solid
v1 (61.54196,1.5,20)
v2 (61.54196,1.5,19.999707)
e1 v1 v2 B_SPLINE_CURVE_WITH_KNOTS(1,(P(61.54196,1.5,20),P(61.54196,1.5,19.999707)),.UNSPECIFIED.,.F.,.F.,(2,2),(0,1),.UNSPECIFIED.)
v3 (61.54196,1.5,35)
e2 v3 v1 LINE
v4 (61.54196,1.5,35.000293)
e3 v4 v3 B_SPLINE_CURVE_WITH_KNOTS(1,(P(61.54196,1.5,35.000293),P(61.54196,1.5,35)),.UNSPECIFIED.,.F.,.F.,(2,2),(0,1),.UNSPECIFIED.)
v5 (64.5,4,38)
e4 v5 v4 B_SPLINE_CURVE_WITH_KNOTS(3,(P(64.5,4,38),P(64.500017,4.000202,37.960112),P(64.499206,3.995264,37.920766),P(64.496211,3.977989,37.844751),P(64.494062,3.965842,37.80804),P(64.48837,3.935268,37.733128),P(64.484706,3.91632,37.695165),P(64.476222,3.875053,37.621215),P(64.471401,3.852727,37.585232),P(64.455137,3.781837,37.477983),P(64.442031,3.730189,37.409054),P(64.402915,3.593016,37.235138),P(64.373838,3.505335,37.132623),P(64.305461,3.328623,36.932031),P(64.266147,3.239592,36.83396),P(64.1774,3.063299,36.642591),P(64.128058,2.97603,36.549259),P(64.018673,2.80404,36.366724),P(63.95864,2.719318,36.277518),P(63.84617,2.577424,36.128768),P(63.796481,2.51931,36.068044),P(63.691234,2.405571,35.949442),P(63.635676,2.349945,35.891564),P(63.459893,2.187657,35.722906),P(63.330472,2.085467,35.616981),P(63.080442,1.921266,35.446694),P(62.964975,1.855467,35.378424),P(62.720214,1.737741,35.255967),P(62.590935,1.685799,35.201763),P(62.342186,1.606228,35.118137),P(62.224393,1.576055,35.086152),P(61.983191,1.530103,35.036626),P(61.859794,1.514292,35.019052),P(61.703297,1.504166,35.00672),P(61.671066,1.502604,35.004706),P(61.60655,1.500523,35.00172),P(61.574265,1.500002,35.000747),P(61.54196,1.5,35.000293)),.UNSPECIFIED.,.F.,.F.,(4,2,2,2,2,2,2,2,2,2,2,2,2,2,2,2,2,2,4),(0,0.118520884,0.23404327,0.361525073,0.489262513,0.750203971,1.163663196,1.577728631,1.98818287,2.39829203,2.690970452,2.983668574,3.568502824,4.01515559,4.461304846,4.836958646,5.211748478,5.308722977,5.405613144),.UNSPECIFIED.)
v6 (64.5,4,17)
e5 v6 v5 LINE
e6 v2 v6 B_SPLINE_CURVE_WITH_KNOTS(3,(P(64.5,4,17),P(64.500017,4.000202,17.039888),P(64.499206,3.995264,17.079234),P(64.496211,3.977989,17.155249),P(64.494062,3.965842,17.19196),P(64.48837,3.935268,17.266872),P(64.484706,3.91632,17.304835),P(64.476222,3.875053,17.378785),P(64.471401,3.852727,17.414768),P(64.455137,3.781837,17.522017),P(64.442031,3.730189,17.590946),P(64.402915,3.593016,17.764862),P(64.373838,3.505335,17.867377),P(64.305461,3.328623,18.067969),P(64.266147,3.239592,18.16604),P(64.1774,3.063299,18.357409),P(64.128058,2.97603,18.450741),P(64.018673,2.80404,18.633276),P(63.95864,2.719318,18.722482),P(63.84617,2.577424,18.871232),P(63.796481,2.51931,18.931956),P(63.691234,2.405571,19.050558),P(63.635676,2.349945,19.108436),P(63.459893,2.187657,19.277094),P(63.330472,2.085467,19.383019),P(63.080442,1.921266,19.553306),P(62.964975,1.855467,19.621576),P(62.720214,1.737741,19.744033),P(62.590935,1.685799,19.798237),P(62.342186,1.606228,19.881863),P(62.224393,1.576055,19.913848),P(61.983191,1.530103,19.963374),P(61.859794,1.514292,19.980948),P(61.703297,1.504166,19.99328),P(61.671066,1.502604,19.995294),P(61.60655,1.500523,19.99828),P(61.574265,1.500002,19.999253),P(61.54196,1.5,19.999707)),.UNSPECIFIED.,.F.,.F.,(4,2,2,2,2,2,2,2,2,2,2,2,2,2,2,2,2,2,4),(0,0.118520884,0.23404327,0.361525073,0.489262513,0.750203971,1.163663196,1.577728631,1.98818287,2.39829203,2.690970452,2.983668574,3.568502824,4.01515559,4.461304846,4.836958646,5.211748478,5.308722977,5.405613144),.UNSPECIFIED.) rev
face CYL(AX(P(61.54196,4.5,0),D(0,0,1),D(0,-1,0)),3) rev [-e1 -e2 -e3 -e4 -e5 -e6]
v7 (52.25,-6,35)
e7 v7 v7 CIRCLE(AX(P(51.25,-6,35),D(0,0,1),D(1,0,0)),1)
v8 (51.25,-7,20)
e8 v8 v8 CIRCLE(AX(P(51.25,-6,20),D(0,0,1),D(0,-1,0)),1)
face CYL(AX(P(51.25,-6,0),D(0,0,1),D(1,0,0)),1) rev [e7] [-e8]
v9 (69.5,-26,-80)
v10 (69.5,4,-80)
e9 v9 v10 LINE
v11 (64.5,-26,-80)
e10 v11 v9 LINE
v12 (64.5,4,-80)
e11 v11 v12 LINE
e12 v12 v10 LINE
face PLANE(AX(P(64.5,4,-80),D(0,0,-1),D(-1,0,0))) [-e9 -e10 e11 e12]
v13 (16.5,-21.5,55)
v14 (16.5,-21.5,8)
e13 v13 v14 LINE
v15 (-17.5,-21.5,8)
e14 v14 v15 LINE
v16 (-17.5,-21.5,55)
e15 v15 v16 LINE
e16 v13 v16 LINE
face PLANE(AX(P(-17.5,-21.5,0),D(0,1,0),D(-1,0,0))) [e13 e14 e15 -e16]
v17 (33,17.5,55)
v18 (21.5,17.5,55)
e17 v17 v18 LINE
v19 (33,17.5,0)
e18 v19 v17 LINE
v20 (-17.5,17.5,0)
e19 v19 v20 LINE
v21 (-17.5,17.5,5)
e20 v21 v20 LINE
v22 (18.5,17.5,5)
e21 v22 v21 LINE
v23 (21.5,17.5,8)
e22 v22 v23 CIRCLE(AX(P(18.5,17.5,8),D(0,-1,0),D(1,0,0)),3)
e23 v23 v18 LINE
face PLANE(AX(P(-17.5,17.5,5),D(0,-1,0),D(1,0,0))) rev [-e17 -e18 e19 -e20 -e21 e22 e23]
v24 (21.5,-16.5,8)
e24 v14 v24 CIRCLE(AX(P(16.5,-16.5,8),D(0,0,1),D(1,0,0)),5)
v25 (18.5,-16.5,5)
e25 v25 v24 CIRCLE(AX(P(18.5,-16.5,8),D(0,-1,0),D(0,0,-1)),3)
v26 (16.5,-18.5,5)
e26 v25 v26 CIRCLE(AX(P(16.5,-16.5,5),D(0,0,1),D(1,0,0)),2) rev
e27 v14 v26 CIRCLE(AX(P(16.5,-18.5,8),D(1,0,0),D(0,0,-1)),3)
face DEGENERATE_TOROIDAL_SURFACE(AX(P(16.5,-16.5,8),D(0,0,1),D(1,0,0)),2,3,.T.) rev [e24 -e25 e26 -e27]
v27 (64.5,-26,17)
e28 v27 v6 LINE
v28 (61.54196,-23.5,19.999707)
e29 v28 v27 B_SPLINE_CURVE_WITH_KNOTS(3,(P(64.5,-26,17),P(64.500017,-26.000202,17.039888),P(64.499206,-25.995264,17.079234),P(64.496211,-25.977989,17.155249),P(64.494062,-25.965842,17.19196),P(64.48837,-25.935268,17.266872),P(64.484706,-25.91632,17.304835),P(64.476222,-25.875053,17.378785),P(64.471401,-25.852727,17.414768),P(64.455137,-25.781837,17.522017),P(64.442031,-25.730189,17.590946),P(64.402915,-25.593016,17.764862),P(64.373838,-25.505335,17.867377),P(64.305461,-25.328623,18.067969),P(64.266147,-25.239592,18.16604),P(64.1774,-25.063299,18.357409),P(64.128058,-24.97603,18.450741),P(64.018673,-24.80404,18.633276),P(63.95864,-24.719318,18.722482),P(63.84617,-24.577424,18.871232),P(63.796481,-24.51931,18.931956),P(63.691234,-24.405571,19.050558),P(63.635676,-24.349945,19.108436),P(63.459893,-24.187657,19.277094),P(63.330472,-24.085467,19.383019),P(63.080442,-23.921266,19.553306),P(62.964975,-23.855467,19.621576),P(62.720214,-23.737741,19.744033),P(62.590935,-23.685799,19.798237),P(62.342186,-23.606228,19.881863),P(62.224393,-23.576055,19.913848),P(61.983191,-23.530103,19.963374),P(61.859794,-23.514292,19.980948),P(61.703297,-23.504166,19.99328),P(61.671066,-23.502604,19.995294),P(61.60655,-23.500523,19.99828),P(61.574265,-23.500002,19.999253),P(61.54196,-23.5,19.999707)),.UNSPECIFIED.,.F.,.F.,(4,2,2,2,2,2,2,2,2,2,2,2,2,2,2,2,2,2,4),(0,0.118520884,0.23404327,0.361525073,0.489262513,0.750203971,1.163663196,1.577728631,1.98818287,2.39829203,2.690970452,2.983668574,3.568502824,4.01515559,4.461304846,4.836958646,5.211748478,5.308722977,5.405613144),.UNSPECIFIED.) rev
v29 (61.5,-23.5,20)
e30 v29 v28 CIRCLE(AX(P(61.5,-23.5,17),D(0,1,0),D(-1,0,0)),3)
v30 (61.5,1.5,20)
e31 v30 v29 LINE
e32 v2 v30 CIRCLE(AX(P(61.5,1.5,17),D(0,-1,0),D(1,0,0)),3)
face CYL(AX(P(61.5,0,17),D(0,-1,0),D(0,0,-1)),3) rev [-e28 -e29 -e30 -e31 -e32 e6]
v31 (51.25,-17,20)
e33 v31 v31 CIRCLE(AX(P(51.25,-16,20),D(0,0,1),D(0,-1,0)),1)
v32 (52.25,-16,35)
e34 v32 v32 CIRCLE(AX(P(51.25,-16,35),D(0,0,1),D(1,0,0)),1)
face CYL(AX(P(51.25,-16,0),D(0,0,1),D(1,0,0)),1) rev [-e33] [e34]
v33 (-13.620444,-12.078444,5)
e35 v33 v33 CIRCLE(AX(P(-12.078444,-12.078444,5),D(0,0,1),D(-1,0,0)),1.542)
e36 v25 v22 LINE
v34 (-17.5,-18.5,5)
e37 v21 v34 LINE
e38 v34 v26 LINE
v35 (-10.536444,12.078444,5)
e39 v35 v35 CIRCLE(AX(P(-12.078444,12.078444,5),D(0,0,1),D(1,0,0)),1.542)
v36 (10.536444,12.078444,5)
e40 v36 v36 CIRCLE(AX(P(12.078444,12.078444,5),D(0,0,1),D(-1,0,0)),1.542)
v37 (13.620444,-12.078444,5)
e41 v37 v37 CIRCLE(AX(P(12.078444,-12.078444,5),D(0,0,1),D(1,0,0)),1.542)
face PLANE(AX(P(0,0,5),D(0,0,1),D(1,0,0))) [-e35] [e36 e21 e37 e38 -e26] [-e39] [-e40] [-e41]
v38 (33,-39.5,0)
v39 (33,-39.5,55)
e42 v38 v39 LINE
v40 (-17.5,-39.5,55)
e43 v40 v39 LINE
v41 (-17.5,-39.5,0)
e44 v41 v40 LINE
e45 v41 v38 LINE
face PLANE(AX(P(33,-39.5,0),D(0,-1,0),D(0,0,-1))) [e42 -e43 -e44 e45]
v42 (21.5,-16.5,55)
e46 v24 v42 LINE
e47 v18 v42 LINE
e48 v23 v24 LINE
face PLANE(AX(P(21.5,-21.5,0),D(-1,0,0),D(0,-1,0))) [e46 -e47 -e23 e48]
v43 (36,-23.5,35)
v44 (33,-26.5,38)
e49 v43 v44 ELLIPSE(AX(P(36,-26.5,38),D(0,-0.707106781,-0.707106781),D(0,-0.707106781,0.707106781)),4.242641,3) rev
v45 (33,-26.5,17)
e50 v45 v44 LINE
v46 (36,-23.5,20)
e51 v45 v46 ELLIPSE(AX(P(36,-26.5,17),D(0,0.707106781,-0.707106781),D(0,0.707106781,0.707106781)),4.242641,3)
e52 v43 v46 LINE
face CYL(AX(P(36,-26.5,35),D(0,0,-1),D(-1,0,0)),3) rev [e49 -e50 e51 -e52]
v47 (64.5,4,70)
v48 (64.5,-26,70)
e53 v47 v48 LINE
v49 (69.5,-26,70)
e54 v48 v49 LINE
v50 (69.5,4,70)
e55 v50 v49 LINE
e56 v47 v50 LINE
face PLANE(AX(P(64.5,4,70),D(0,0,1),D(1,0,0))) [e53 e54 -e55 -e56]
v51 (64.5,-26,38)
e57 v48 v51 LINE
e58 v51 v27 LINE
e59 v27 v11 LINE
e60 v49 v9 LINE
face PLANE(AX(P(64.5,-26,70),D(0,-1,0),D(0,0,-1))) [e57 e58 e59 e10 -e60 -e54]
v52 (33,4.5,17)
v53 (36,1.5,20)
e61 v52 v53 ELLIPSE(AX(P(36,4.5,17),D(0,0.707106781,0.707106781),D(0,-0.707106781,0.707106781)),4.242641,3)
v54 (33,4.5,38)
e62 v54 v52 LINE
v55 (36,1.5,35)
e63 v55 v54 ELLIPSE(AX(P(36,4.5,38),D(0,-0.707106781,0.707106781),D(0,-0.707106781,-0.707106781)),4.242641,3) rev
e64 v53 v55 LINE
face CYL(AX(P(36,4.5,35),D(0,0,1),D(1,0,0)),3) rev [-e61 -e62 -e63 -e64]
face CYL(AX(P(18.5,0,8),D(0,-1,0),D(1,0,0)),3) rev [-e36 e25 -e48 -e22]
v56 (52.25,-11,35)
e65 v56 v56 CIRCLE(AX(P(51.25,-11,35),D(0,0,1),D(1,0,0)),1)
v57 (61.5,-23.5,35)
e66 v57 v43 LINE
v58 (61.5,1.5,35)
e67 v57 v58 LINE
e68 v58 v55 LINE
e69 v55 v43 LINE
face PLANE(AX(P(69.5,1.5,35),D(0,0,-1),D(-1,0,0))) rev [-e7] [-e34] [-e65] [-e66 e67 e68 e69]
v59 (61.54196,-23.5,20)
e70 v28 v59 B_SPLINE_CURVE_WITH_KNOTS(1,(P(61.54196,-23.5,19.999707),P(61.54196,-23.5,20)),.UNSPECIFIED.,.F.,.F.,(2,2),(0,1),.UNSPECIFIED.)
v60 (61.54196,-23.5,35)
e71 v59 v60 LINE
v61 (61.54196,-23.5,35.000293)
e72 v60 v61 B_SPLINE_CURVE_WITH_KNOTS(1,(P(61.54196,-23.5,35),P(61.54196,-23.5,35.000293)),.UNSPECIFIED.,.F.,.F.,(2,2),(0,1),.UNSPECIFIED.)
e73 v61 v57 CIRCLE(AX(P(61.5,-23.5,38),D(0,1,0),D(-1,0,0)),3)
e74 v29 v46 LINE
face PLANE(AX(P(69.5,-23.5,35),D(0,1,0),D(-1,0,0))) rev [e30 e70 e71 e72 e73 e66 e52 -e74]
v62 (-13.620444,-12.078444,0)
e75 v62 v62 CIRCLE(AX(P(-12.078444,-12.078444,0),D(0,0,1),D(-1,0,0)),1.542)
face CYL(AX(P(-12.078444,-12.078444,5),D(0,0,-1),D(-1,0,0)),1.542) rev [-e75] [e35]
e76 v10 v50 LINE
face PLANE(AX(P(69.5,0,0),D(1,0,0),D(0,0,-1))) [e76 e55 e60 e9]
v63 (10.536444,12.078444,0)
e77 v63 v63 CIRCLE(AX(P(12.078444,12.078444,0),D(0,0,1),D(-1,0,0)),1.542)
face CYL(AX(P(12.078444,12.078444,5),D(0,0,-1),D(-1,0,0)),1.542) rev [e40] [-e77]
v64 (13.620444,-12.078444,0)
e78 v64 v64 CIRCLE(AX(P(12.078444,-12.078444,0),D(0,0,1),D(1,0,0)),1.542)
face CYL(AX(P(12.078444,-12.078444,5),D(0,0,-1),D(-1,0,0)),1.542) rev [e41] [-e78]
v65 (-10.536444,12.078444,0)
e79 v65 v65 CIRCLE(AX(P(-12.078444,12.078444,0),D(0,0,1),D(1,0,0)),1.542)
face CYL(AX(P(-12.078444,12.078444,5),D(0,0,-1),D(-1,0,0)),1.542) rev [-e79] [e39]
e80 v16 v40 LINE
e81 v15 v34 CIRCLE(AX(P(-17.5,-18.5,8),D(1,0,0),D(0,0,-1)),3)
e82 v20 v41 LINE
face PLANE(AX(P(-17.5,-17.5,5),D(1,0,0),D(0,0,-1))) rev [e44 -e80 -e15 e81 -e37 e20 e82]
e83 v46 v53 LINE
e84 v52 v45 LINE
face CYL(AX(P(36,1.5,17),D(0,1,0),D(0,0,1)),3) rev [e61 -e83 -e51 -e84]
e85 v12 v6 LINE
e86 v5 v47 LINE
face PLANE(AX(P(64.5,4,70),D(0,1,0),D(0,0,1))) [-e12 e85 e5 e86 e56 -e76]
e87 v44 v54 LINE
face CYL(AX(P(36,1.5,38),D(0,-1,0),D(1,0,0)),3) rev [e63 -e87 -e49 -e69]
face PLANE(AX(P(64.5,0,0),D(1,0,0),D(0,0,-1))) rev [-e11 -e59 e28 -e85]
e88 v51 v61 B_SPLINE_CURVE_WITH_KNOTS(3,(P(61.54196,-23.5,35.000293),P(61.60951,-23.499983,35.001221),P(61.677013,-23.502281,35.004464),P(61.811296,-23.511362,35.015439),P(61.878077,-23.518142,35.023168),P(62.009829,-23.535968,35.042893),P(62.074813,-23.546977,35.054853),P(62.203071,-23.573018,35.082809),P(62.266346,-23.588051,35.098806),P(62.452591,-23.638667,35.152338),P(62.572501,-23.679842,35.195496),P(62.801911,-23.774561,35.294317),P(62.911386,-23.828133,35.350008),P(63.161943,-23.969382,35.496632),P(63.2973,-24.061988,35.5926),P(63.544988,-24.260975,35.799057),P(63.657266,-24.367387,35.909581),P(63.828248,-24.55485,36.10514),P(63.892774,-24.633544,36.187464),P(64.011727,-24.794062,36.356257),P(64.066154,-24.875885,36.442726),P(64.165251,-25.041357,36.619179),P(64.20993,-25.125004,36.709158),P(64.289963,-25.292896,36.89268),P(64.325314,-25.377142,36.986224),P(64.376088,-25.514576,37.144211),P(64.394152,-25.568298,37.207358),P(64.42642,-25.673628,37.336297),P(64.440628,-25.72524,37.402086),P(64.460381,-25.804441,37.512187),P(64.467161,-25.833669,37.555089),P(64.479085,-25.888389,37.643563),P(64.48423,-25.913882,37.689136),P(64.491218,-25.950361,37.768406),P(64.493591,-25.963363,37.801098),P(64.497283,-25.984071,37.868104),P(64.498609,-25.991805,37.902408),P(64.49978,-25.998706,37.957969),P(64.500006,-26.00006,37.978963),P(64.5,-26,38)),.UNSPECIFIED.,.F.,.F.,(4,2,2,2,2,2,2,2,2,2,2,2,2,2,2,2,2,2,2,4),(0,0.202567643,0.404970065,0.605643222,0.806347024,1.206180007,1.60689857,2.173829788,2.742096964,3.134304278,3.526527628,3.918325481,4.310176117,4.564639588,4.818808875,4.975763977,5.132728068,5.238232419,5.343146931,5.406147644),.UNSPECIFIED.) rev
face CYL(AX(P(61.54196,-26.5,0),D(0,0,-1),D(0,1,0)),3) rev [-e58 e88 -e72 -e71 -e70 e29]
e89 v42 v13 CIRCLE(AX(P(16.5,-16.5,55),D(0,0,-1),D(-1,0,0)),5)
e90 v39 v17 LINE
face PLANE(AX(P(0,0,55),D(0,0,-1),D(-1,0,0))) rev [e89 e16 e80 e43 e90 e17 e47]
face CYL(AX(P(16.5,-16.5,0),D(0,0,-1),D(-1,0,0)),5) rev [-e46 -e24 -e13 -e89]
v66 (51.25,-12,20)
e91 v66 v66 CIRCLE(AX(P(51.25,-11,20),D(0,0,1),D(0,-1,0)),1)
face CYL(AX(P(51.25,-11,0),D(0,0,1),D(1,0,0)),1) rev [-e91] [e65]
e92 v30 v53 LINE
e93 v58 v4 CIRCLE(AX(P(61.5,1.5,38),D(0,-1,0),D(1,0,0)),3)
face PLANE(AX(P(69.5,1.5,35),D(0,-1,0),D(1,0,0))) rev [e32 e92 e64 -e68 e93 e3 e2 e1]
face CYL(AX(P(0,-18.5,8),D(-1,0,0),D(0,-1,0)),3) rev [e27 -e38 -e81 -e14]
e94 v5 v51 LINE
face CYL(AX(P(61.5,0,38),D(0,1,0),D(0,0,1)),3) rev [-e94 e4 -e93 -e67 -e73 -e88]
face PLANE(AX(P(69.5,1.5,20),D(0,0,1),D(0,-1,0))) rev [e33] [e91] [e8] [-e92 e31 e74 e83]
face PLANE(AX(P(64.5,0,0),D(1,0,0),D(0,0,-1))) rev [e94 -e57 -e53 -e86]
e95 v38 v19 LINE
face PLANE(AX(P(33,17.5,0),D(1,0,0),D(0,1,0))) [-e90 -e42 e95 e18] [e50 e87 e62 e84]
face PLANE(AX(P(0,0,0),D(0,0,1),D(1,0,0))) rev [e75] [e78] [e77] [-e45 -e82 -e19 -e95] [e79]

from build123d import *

# Parameters (mm, degrees)
SKETCH1_R                = 1.542
BOSS_EXTRUDE1_DEPTH      = 5
BOSS_EXTRUDE4_DEPTH      = 50
BOSS_EXTRUDE4_DEPTH_BACK = 5
FILLET3_R                = 3
FILLET4_R                = 5
BOSS_EXTRUDE5_DEPTH      = 55
SKETCH7_W                = 15
SKETCH7_H                = 25
BOSS_EXTRUDE6_DEPTH      = 36.5
SKETCH8_R                = 1
CUT_EXTRUDE1_DEPTH       = 88.266832187
SKETCH9_W                = 150
SKETCH9_H                = 30
BOSS_EXTRUDE7_DEPTH      = 5
FILLET5_R                = 3
FILLET6_R                = 3


with BuildPart() as part:
    # Sketch1 → Boss-Extrude1 (new body)
    with BuildSketch(Plane.XY):
        Polygon((-17.5, 17.5), (17.5, 17.5), (21.5, 17.5), (21.5, -21.5), (17.5, -21.5), (-17.5, -21.5), (-17.5, -17.5), align=None)
        with Locations((-12.078444483, 12.078444483)):
            Circle(SKETCH1_R, mode=Mode.SUBTRACT)
        with Locations(Location((12.078444483, 12.078444483, 0), (0, 0, 180))):
            Circle(SKETCH1_R, mode=Mode.SUBTRACT)
        with Locations((12.078444483, -12.078444483)):
            Circle(SKETCH1_R, mode=Mode.SUBTRACT)
        with Locations(Location((-12.078444483, -12.078444483, 0), (0, 0, 180))):
            Circle(SKETCH1_R, mode=Mode.SUBTRACT)
    extrude(amount=BOSS_EXTRUDE1_DEPTH)

    # Sketch4 → Boss-Extrude4 (add, two sides: drawn at the far end of the back side and taken through both)
    with BuildSketch(Plane.XY.offset(5).offset(-BOSS_EXTRUDE4_DEPTH_BACK)):
        Polygon((21.5, 17.5), (26, 17.5), (26, -26), (-17.5, -26), (-17.5, -21.5), (21.5, -21.5), align=None)
    extrude(amount=BOSS_EXTRUDE4_DEPTH + BOSS_EXTRUDE4_DEPTH_BACK)

    # Fillet3
    fillet3_edges = [part.edges().sort_by_distance(p)[0] for p in [
        (2, -21.5, 5),
        (21.5, -2, 5),
    ]]
    fillet(fillet3_edges, radius=FILLET3_R)

    # Fillet4
    # the kernel refuses this fillet: 5 mm, written as the material it adds along each edge
    with BuildSketch(Plane(origin=(16.5, -16.5, 5), x_dir=(1, 0, 0), z_dir=(0, 1, 0))) as fillet4_piece_1:
        with BuildLine():
            CenterArc((2, -3), 3, 0, 90)
            Line((5, -3), (5, 0))
            Line((5, 0), (2, 0))
        make_face()
    revolve(axis=Axis((16.5, -16.5, 5), (0, 0, -1)), revolution_arc=90)
    with BuildSketch(Plane(origin=(21.5, -21.5, 5), x_dir=(0, 1, 0), z_dir=(0, 0, 1))) as fillet4_piece_2:
        with BuildLine():
            CenterArc((FILLET4_R, FILLET4_R), FILLET4_R, 180, 90)
            Line((0, FILLET4_R), (0, 0))
            Line((0, 0), (FILLET4_R, 0))
        make_face()
    extrude(amount=50)

    # Sketch6 → Boss-Extrude5 (add, through all)
    with BuildSketch(Plane.XY.offset(55)):
        Polygon((-17.5, -26), (26, -26), (26, 17.5), (33, 17.5), (33, -39.5), (26, -39.5), (-17.5, -39.5), align=None)
    extrude(amount=-BOSS_EXTRUDE5_DEPTH)

    # Sketch7 → Boss-Extrude6 (add)
    with BuildSketch(Plane(origin=(33, 0, 0), x_dir=(0, 0, -1), z_dir=(1, 0, 0))):
        with Locations((-27.5, -11)):
            Rectangle(SKETCH7_W, SKETCH7_H)
    extrude(amount=BOSS_EXTRUDE6_DEPTH)

    # Sketch8 → Cut-Extrude1 (cut, through all)
    with BuildSketch(Plane.XY.offset(35)):
        with Locations((51.25, -11)):
            Circle(SKETCH8_R)
        with Locations((51.25, -16)):
            Circle(SKETCH8_R)
        with Locations((51.25, -6)):
            Circle(SKETCH8_R)
    extrude(amount=-CUT_EXTRUDE1_DEPTH, mode=Mode.SUBTRACT)

    # Sketch9 → Boss-Extrude7 (add)
    with BuildSketch(Plane(origin=(69.5, 0, 0), x_dir=(0, 0, -1), z_dir=(1, 0, 0))):
        with Locations((5, -11)):
            Rectangle(SKETCH9_W, SKETCH9_H)
    extrude(amount=-BOSS_EXTRUDE7_DEPTH)

    # Fillet5
    # the kernel refuses this fillet: 3 mm, written as the material it adds along each edge
    with BuildSketch(Plane(origin=(64.5, -23.5, 35), x_dir=(-1, 0, 0), z_dir=(0, 0, -1)), Plane(origin=(64.5, 1.5, 20), x_dir=(-1, 0, 0), z_dir=(0, 0, 1))) as fillet5_piece_1:
        with BuildLine():
            CenterArc((2.958039892, -3), FILLET5_R, 90, 80.405931773)
            Line((0, -2.5), (-0.059160798, -2.49))
            ThreePointArc((-0.059160798, -2.49), (-0.06, -1.25), (-0.06, 0))
            Line((-0.06, 0), (0, 0.06))
            Line((0, 0.06), (2.958039892, 0.06))
            Line((2.958039892, 0.06), (2.958039892, 0))
        make_face()
    extrude(amount=15)
    with BuildSketch(Plane(origin=(64.5, -23.5, 20), x_dir=(-1, 0, 0), z_dir=(0, 1, 0)), Plane(origin=(64.5, 1.5, 35), x_dir=(-1, 0, 0), z_dir=(0, -1, 0))) as fillet5_piece_2:
        with BuildLine():
            CenterArc((FILLET5_R, -FILLET5_R), FILLET5_R, 90, 90)
            Line((0, -FILLET5_R), (-FILLET5_R * 0.02, -FILLET5_R))
            Line((-FILLET5_R * 0.02, -FILLET5_R), (-FILLET5_R * 0.02, FILLET5_R * 0.02))
            Line((-FILLET5_R * 0.02, FILLET5_R * 0.02), (FILLET5_R, FILLET5_R * 0.02))
            Line((FILLET5_R, FILLET5_R * 0.02), (FILLET5_R, 0))
        make_face()
    extrude(amount=25)
    with BuildSketch(Plane(origin=(64.5, -23.5, 42.395099729), x_dir=(-1, 0, 0), z_dir=(0, 0, -1))) as fillet5_piece_3a_section:
        with BuildLine():
            CenterArc((2.958039892, -3), FILLET5_R, 90, 80.405931773)
            Line((0, -2.5), (-0.059160798, -2.49))
            ThreePointArc((-0.059160798, -2.49), (-0.06, -1.25), (-0.06, 0))
            Line((-0.06, 0), (0, 0.06))
            Line((0, 0.06), (2.958039892, 0.06))
            Line((2.958039892, 0.06), (2.958039892, 0))
        make_face()
    fillet5_piece_3a = extrude(amount=22.395099729, mode=Mode.PRIVATE)
    fillet5_piece_3a = split(fillet5_piece_3a, bisect_by=Plane(origin=(63.81401797, -24.116958935, 35), z_dir=(0, 0, 1)), keep=Keep.TOP, mode=Mode.PRIVATE)
    with BuildSketch(Plane(origin=(64.5, 1.5, 35), x_dir=(-1, 0, 0), z_dir=(0, -1, 0))) as fillet5_piece_3b_section:
        with BuildLine():
            CenterArc((FILLET5_R, -FILLET5_R), FILLET5_R, 90, 90)
            Line((0, -FILLET5_R), (-FILLET5_R * 0.02, -FILLET5_R))
            Line((-FILLET5_R * 0.02, -FILLET5_R), (-FILLET5_R * 0.02, FILLET5_R * 0.02))
            Line((-FILLET5_R * 0.02, FILLET5_R * 0.02), (FILLET5_R, FILLET5_R * 0.02))
            Line((FILLET5_R, FILLET5_R * 0.02), (FILLET5_R, 0))
        make_face()
    fillet5_piece_3b = extrude(amount=32.5, mode=Mode.PRIVATE)
    fillet5_piece_3b = split(fillet5_piece_3b, bisect_by=Plane(origin=(63.820814657, -23.5, 35.679185343), z_dir=(0, -1, 0)), keep=Keep.TOP, mode=Mode.PRIVATE)
    fillet5_piece_3b = split(fillet5_piece_3b, bisect_by=Plane(origin=(63.820814657, -26, 35.679185343), z_dir=(0, 1, 0)), keep=Keep.TOP, mode=Mode.PRIVATE)
    fillet5_piece_3 = fillet5_piece_3a & fillet5_piece_3b
    add(fillet5_piece_3)
    with BuildSketch(Plane(origin=(64.5, -31, 20), x_dir=(-1, 0, 0), z_dir=(0, 1, 0))) as fillet5_piece_4a_section:
        with BuildLine():
            CenterArc((FILLET5_R, -FILLET5_R), FILLET5_R, 90, 90)
            Line((0, -FILLET5_R), (-FILLET5_R * 0.02, -FILLET5_R))
            Line((-FILLET5_R * 0.02, -FILLET5_R), (-FILLET5_R * 0.02, FILLET5_R * 0.02))
            Line((-FILLET5_R * 0.02, FILLET5_R * 0.02), (FILLET5_R, FILLET5_R * 0.02))
            Line((FILLET5_R, FILLET5_R * 0.02), (FILLET5_R, 0))
        make_face()
    fillet5_piece_4a = extrude(amount=32.5, mode=Mode.PRIVATE)
    fillet5_piece_4a = split(fillet5_piece_4a, bisect_by=Plane(origin=(63.820814657, -23.5, 19.320814657), z_dir=(0, -1, 0)), keep=Keep.TOP, mode=Mode.PRIVATE)
    fillet5_piece_4a = split(fillet5_piece_4a, bisect_by=Plane(origin=(63.820814657, -26, 19.320814657), z_dir=(0, 1, 0)), keep=Keep.TOP, mode=Mode.PRIVATE)
    with BuildSketch(Plane(origin=(64.5, -23.5, 35), x_dir=(-1, 0, 0), z_dir=(0, 0, -1))) as fillet5_piece_4b_section:
        with BuildLine():
            CenterArc((2.958039892, -3), FILLET5_R, 90, 80.405931773)
            Line((0, -2.5), (-0.059160798, -2.49))
            ThreePointArc((-0.059160798, -2.49), (-0.06, -1.25), (-0.06, 0))
            Line((-0.06, 0), (0, 0.06))
            Line((0, 0.06), (2.958039892, 0.06))
            Line((2.958039892, 0.06), (2.958039892, 0))
        make_face()
    fillet5_piece_4b = extrude(amount=22.395099729, mode=Mode.PRIVATE)
    fillet5_piece_4b = split(fillet5_piece_4b, bisect_by=Plane(origin=(63.81401797, -24.116958935, 20), z_dir=(0, 0, -1)), keep=Keep.TOP, mode=Mode.PRIVATE)
    fillet5_piece_4 = fillet5_piece_4a & fillet5_piece_4b
    add(fillet5_piece_4)
    with BuildSketch(Plane(origin=(64.5, 1.5, 12.604900271), x_dir=(-1, 0, 0), z_dir=(0, 0, 1))) as fillet5_piece_5a_section:
        with BuildLine():
            CenterArc((2.958039892, -3), FILLET5_R, 90, 80.405931773)
            Line((0, -2.5), (-0.059160798, -2.49))
            ThreePointArc((-0.059160798, -2.49), (-0.06, -1.25), (-0.06, 0))
            Line((-0.06, 0), (0, 0.06))
            Line((0, 0.06), (2.958039892, 0.06))
            Line((2.958039892, 0.06), (2.958039892, 0))
        make_face()
    fillet5_piece_5a = extrude(amount=22.395099729, mode=Mode.PRIVATE)
    fillet5_piece_5a = split(fillet5_piece_5a, bisect_by=Plane(origin=(63.81401797, 2.116958935, 20), z_dir=(0, 0, -1)), keep=Keep.TOP, mode=Mode.PRIVATE)
    with BuildSketch(Plane(origin=(64.5, -23.5, 20), x_dir=(-1, 0, 0), z_dir=(0, 1, 0))) as fillet5_piece_5b_section:
        with BuildLine():
            CenterArc((FILLET5_R, -FILLET5_R), FILLET5_R, 90, 90)
            Line((0, -FILLET5_R), (-FILLET5_R * 0.02, -FILLET5_R))
            Line((-FILLET5_R * 0.02, -FILLET5_R), (-FILLET5_R * 0.02, FILLET5_R * 0.02))
            Line((-FILLET5_R * 0.02, FILLET5_R * 0.02), (FILLET5_R, FILLET5_R * 0.02))
            Line((FILLET5_R, FILLET5_R * 0.02), (FILLET5_R, 0))
        make_face()
    fillet5_piece_5b = extrude(amount=32.5, mode=Mode.PRIVATE)
    fillet5_piece_5b = split(fillet5_piece_5b, bisect_by=Plane(origin=(63.820814657, 1.5, 19.320814657), z_dir=(0, 1, 0)), keep=Keep.TOP, mode=Mode.PRIVATE)
    fillet5_piece_5b = split(fillet5_piece_5b, bisect_by=Plane(origin=(63.820814657, 4, 19.320814657), z_dir=(0, -1, 0)), keep=Keep.TOP, mode=Mode.PRIVATE)
    fillet5_piece_5 = fillet5_piece_5a & fillet5_piece_5b
    add(fillet5_piece_5)
    with BuildSketch(Plane(origin=(64.5, 1.5, 20), x_dir=(-1, 0, 0), z_dir=(0, 0, 1))) as fillet5_piece_6a_section:
        with BuildLine():
            CenterArc((2.958039892, -3), FILLET5_R, 90, 80.405931773)
            Line((0, -2.5), (-0.059160798, -2.49))
            ThreePointArc((-0.059160798, -2.49), (-0.06, -1.25), (-0.06, 0))
            Line((-0.06, 0), (0, 0.06))
            Line((0, 0.06), (2.958039892, 0.06))
            Line((2.958039892, 0.06), (2.958039892, 0))
        make_face()
    fillet5_piece_6a = extrude(amount=22.395099729, mode=Mode.PRIVATE)
    fillet5_piece_6a = split(fillet5_piece_6a, bisect_by=Plane(origin=(63.81401797, 2.116958935, 35), z_dir=(0, 0, 1)), keep=Keep.TOP, mode=Mode.PRIVATE)
    with BuildSketch(Plane(origin=(64.5, 9, 35), x_dir=(-1, 0, 0), z_dir=(0, -1, 0))) as fillet5_piece_6b_section:
        with BuildLine():
            CenterArc((FILLET5_R, -FILLET5_R), FILLET5_R, 90, 90)
            Line((0, -FILLET5_R), (-FILLET5_R * 0.02, -FILLET5_R))
            Line((-FILLET5_R * 0.02, -FILLET5_R), (-FILLET5_R * 0.02, FILLET5_R * 0.02))
            Line((-FILLET5_R * 0.02, FILLET5_R * 0.02), (FILLET5_R, FILLET5_R * 0.02))
            Line((FILLET5_R, FILLET5_R * 0.02), (FILLET5_R, 0))
        make_face()
    fillet5_piece_6b = extrude(amount=32.5, mode=Mode.PRIVATE)
    fillet5_piece_6b = split(fillet5_piece_6b, bisect_by=Plane(origin=(63.820814657, 1.5, 35.679185343), z_dir=(0, 1, 0)), keep=Keep.TOP, mode=Mode.PRIVATE)
    fillet5_piece_6b = split(fillet5_piece_6b, bisect_by=Plane(origin=(63.820814657, 4, 35.679185343), z_dir=(0, -1, 0)), keep=Keep.TOP, mode=Mode.PRIVATE)
    fillet5_piece_6 = fillet5_piece_6a & fillet5_piece_6b
    add(fillet5_piece_6)

    # Fillet6
    fillet6_edges = [part.edges().sort_by_distance(p)[0] for p in [
        (33, -11, 20),
        (33, 1.5, 27.5),
        (33, -11, 35),
        (33, -23.5, 27.5),
    ]]
    fillet(fillet6_edges, radius=FILLET6_R)


solid = part.part
